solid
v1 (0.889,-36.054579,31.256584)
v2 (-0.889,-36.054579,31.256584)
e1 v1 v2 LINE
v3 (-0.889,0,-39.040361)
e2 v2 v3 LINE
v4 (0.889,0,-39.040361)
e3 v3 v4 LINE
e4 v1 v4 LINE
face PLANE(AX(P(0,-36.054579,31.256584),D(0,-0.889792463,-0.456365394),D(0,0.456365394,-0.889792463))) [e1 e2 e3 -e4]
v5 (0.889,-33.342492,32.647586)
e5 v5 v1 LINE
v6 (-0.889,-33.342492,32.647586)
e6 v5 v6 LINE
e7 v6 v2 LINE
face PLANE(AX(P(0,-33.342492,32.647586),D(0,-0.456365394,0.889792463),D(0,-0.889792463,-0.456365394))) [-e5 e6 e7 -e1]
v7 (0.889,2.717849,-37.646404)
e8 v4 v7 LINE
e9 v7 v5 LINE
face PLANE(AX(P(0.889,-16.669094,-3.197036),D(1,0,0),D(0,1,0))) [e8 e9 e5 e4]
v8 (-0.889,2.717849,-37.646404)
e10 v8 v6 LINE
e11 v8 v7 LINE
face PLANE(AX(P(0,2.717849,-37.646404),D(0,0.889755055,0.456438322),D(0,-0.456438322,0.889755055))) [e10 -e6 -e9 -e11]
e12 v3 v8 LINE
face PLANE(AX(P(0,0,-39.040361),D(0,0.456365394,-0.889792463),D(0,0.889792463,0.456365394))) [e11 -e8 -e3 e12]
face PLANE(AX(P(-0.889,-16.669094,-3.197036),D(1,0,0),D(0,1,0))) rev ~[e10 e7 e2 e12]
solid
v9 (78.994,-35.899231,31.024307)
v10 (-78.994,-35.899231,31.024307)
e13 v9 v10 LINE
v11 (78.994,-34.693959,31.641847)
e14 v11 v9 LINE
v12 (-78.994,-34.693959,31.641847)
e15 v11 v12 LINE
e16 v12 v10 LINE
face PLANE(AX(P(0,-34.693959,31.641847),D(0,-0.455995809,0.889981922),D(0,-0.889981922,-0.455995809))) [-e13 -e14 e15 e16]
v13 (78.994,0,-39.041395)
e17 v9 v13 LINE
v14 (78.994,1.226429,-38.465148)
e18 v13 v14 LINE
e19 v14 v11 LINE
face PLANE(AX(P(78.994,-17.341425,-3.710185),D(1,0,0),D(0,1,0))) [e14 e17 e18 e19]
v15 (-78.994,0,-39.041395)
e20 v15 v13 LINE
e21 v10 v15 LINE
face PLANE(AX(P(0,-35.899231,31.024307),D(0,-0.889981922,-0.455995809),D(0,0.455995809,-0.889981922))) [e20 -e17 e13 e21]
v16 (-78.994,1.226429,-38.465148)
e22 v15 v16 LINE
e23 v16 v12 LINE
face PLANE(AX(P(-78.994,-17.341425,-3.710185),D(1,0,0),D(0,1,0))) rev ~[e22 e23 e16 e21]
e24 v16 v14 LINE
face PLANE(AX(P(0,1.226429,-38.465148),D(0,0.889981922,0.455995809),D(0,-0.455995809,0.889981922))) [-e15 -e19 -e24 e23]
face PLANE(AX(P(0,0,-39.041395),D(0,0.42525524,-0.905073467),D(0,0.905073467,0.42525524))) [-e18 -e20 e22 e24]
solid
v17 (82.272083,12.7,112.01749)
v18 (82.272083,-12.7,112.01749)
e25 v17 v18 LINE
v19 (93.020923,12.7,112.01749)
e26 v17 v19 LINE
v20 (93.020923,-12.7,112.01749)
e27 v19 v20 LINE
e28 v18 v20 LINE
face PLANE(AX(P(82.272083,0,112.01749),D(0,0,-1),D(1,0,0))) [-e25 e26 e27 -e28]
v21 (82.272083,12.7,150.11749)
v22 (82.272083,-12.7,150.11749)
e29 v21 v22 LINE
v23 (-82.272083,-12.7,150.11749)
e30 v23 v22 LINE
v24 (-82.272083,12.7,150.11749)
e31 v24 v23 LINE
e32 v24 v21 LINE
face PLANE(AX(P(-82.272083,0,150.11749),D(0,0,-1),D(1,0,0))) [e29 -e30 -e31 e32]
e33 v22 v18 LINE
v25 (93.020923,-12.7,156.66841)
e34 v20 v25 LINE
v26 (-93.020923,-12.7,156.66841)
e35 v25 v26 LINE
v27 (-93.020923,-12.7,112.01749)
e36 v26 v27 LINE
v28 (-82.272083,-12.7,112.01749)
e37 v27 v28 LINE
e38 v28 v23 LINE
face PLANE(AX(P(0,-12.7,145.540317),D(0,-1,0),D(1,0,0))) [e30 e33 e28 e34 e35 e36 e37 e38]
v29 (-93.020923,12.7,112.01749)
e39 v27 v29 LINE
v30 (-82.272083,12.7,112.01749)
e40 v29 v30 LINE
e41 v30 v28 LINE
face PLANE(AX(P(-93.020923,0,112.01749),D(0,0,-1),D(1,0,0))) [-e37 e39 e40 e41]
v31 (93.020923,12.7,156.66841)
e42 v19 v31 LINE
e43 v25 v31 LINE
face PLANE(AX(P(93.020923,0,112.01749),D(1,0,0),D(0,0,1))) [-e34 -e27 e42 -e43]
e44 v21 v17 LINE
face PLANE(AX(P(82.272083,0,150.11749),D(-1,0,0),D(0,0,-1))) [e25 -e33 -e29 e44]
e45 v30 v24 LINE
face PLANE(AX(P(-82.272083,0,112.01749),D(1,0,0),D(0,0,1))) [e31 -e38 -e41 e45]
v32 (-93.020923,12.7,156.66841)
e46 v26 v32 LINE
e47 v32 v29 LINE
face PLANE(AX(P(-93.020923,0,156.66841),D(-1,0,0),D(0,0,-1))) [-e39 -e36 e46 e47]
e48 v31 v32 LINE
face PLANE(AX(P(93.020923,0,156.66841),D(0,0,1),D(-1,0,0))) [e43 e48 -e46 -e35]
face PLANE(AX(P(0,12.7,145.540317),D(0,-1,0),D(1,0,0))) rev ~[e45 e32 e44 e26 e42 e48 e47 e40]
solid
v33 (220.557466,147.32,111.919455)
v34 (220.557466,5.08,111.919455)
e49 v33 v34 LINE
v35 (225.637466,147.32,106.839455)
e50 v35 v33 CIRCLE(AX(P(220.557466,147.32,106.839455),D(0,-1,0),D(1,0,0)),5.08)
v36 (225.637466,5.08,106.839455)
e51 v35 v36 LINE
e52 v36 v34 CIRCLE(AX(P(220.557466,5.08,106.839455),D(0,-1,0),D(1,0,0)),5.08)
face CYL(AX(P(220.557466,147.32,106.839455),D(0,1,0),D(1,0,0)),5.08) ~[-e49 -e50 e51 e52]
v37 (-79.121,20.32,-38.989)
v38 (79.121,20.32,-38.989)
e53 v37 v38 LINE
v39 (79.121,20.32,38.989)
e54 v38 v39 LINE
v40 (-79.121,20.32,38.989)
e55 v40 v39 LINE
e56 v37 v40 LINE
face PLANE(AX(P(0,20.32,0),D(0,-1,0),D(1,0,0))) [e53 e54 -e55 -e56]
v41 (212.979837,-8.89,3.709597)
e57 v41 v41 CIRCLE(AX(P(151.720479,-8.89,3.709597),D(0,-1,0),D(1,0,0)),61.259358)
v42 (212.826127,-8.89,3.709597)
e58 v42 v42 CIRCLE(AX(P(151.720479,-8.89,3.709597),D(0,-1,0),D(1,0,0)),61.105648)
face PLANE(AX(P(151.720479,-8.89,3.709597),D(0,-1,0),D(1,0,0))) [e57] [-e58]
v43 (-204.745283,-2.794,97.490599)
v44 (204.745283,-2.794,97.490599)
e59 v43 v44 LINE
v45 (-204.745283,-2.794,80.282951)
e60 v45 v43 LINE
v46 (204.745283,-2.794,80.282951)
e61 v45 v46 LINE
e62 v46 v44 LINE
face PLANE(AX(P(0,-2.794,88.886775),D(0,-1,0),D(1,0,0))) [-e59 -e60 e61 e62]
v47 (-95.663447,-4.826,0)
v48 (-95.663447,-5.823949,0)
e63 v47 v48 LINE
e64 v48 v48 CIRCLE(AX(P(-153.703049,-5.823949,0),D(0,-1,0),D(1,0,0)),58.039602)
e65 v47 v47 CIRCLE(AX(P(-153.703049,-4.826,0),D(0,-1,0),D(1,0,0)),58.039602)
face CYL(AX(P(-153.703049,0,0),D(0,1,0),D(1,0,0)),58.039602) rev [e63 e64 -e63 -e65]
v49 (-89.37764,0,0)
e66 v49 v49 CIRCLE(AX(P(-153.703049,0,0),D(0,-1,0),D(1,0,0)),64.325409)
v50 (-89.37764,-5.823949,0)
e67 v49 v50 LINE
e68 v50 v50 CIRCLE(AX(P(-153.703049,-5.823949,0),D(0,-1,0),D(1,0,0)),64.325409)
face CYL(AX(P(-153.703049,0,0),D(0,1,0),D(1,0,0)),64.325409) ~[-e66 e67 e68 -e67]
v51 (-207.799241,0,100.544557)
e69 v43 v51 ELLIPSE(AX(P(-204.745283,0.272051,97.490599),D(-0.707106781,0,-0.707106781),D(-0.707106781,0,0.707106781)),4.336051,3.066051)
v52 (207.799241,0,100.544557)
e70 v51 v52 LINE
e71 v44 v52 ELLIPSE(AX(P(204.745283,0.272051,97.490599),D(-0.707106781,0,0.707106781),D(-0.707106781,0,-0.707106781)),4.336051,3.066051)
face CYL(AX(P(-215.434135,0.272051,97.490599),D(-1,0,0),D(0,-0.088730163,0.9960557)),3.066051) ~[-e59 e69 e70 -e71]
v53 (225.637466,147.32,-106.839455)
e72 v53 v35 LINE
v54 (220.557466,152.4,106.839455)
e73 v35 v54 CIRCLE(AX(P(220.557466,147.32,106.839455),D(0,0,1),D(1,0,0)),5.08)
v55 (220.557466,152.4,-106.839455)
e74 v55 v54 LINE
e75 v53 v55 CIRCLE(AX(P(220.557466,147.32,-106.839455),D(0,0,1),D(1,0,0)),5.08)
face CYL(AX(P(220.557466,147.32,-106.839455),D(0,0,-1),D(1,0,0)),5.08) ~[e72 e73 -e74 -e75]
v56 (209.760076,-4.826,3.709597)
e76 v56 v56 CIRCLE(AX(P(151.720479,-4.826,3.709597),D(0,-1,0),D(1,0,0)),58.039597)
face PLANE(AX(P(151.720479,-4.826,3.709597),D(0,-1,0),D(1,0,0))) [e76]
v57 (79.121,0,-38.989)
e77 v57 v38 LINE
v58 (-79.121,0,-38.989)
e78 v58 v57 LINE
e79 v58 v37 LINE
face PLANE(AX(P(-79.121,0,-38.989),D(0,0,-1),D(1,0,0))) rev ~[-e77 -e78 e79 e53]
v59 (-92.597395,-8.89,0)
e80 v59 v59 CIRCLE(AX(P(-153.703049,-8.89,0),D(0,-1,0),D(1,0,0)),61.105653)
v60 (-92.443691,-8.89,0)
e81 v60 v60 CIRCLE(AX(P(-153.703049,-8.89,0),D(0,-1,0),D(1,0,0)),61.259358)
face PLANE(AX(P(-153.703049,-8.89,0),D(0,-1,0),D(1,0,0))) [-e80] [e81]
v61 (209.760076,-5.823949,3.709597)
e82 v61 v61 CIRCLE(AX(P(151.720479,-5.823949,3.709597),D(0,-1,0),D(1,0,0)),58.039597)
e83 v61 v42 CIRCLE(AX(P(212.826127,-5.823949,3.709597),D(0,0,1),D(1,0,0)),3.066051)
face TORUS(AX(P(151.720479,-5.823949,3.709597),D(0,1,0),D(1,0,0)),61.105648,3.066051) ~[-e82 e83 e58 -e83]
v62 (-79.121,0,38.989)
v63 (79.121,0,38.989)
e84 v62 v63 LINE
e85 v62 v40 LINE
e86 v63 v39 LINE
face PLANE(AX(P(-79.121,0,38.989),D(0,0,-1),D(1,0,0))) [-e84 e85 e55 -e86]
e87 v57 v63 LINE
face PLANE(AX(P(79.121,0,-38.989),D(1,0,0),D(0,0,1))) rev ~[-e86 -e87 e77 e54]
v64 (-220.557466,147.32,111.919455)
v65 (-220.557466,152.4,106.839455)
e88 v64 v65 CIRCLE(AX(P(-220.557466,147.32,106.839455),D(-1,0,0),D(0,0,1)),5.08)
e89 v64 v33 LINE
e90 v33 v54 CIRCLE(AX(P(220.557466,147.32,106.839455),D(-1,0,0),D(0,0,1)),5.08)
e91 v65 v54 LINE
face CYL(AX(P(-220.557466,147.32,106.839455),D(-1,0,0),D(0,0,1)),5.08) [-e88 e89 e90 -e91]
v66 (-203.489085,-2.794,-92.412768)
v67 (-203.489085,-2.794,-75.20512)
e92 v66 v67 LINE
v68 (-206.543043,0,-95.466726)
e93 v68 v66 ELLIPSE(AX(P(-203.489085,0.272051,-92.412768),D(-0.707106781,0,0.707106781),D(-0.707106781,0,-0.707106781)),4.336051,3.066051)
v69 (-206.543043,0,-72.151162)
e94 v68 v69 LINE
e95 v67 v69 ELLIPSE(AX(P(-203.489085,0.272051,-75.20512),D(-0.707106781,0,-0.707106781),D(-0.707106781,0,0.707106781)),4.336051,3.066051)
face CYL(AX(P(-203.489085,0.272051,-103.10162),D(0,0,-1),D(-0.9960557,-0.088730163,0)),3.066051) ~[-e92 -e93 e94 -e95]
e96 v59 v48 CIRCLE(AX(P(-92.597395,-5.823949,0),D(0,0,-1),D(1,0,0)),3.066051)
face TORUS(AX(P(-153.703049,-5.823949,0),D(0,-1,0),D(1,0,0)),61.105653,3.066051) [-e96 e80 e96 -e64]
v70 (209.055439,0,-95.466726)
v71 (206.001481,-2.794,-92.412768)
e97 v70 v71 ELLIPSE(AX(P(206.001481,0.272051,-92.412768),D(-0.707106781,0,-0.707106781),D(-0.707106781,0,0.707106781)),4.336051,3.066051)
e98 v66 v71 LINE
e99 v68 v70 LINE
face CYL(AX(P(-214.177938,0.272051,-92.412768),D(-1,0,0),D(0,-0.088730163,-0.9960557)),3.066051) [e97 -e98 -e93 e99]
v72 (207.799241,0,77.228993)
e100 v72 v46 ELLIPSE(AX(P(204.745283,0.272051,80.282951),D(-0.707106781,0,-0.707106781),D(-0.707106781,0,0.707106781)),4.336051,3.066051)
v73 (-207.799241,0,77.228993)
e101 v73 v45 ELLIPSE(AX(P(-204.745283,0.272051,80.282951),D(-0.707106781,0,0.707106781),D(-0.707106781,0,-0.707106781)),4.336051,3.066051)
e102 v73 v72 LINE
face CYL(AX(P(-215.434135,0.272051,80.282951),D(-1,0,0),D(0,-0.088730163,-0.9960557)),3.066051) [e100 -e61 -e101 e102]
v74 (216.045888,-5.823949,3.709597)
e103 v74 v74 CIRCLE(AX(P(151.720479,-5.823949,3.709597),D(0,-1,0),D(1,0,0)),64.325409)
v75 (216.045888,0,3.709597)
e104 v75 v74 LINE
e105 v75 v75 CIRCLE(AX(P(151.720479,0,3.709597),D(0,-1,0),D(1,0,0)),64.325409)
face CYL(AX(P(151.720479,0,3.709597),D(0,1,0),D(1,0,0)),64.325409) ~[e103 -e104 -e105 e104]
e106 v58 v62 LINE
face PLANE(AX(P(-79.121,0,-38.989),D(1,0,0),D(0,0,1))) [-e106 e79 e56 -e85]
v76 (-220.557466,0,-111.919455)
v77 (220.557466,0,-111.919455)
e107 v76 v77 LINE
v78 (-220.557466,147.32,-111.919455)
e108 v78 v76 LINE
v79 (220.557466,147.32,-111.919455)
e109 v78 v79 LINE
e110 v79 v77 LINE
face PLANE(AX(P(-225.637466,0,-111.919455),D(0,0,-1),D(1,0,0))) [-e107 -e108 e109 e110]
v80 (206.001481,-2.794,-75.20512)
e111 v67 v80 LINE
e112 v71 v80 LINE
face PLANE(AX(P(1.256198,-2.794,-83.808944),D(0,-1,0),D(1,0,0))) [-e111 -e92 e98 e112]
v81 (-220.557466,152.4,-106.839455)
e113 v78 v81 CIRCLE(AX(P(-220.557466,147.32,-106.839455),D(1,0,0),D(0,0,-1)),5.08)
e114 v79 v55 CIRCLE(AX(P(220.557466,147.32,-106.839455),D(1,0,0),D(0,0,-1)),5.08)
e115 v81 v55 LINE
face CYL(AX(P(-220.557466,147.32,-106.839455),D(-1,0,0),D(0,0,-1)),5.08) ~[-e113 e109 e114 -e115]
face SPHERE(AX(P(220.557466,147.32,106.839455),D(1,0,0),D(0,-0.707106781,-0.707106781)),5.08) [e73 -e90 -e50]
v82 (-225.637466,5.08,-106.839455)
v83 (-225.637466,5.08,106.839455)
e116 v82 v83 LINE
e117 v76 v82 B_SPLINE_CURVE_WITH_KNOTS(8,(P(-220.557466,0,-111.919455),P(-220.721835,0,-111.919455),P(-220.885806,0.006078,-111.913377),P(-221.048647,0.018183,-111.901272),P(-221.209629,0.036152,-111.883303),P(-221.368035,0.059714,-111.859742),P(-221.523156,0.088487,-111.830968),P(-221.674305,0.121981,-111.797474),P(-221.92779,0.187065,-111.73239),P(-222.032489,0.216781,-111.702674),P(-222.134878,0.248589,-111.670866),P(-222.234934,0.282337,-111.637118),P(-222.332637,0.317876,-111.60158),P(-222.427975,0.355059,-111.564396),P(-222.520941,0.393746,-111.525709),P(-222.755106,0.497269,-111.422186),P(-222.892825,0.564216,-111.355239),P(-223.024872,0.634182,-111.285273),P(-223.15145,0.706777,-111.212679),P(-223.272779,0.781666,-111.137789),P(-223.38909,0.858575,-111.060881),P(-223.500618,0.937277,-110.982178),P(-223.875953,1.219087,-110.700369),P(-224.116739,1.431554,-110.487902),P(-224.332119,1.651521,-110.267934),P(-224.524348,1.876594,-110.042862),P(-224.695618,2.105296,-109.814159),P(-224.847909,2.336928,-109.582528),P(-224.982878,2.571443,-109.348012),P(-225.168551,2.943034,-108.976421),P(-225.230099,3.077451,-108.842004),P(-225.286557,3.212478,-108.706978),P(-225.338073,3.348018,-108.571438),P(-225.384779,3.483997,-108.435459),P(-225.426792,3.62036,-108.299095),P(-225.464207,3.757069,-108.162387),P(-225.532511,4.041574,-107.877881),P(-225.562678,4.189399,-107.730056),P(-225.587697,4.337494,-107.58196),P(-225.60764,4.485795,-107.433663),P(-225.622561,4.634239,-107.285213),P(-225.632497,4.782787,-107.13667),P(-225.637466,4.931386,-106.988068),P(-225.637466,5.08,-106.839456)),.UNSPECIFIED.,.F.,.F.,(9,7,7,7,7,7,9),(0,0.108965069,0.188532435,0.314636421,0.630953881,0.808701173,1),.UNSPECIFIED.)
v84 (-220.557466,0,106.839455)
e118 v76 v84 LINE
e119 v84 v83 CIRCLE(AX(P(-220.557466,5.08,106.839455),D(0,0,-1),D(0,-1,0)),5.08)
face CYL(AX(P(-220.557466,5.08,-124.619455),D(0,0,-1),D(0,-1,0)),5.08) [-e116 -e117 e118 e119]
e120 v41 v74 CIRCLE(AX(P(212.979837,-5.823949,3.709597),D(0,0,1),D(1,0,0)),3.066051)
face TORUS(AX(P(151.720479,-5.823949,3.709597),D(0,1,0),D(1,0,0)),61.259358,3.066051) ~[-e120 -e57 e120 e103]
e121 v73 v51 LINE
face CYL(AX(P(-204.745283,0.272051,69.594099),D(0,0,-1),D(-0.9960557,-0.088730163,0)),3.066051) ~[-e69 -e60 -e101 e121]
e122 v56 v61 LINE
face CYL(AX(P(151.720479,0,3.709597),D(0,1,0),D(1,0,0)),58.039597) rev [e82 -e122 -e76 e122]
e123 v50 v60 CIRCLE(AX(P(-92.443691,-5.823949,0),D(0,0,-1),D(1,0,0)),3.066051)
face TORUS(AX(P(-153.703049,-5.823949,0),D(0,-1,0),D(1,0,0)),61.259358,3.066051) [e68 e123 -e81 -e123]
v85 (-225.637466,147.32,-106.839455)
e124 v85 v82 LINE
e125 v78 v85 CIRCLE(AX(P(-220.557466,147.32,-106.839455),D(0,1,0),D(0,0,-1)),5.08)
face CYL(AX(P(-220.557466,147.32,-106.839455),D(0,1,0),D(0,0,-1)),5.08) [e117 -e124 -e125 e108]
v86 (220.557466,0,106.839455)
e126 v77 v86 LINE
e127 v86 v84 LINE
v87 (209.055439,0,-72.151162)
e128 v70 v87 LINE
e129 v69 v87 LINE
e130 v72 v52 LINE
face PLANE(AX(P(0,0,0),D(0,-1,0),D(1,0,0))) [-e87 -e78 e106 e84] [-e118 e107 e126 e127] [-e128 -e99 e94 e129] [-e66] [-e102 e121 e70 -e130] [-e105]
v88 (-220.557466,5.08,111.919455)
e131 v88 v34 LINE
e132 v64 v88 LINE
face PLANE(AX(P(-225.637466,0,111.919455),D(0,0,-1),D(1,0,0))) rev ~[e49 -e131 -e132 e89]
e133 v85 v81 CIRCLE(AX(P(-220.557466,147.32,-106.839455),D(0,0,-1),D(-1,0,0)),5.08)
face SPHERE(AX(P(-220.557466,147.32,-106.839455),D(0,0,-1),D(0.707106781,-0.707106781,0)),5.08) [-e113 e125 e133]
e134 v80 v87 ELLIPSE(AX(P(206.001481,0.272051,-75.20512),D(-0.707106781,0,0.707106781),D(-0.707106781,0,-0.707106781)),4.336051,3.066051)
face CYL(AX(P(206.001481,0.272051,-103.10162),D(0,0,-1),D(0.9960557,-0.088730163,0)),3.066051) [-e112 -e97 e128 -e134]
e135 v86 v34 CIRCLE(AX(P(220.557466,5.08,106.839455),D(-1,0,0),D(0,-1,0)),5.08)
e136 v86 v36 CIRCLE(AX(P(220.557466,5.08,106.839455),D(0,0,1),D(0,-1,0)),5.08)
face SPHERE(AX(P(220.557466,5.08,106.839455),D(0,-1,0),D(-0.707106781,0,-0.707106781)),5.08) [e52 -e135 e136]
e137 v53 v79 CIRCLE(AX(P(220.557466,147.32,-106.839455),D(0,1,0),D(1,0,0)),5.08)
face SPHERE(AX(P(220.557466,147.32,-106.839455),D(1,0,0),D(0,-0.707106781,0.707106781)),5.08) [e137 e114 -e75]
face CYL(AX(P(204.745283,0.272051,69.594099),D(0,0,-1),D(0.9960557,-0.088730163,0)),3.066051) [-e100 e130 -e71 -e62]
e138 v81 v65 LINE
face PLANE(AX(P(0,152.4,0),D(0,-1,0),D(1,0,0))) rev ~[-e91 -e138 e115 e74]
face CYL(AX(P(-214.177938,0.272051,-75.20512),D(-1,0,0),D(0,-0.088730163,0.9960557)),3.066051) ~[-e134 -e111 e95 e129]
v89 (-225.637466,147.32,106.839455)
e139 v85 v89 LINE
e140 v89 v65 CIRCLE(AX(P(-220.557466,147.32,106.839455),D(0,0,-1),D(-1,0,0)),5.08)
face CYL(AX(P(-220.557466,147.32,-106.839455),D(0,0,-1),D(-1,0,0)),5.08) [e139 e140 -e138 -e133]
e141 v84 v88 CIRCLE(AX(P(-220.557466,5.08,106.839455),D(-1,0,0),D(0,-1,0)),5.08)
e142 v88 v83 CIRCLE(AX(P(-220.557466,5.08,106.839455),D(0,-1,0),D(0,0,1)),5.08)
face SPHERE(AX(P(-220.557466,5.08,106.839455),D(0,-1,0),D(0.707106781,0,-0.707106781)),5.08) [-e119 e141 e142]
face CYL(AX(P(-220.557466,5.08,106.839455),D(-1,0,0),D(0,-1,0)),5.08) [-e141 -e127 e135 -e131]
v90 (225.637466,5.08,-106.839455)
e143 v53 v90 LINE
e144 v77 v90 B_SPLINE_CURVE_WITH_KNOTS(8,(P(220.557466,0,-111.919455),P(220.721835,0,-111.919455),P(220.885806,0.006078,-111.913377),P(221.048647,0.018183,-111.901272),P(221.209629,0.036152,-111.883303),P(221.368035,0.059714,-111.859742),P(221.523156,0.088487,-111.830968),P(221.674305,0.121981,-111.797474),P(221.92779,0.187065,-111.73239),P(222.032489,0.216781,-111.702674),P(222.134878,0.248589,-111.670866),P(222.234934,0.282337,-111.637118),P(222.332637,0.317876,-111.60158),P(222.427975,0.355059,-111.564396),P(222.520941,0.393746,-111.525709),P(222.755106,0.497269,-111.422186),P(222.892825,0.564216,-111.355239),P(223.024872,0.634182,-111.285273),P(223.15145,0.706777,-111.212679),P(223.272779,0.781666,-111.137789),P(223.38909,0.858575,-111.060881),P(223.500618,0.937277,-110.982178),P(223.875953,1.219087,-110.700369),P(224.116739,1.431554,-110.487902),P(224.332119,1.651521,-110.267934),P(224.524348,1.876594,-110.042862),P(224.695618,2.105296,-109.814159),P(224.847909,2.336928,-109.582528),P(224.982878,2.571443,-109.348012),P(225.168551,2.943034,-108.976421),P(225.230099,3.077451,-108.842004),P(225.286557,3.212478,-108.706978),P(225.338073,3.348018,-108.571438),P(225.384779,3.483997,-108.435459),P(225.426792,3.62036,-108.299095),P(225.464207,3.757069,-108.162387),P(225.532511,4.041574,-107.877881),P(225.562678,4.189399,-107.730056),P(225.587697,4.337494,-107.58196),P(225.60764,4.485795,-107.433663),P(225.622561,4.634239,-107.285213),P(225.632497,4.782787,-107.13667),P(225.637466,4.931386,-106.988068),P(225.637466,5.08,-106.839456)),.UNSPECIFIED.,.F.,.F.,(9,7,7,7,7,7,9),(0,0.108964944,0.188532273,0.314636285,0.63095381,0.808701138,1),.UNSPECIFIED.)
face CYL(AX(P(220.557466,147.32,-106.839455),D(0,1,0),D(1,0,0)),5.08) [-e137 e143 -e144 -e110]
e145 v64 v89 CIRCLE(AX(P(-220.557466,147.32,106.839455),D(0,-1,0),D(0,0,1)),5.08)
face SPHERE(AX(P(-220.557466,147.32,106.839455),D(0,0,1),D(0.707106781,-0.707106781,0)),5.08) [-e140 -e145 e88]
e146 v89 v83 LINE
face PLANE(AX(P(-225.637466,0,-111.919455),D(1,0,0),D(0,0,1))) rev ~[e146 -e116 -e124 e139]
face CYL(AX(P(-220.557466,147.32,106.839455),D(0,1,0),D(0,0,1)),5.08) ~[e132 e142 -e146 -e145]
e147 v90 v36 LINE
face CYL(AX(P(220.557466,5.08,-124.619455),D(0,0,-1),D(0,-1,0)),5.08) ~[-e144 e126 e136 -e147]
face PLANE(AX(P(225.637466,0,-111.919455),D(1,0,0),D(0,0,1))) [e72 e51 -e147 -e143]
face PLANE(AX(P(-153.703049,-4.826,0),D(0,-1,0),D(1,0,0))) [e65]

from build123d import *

# Parameters (mm, degrees)
F1_W          = 451.2749314308
F1_H          = 223.8389104605
F2_DEPTH      = 152.4
F0_W          = 158.242
F0_H          = 77.978
F3_DEPTH      = 20.32
F4_R          = 64.3254088221
F4_R_2        = 58.039602145
F4_R_3        = 58.0395969
F5_DEPTH      = 8.89
F6_DEPTH      = 4.826
F7_W          = 415.5984818935
F7_H          = 23.315563798
F8_DEPTH      = 2.794
F10_DEPTH     = 0.889
F12_DEPTH     = 78.994
F14_DEPTH     = 12.7
F15_R         = 3.0660512242
F16_T1_DEPTH  = 430.8682708909
F16_T3_DEPTH  = 38.5853527953
F16_T5_DEPTH  = 430.8682708909
F16_T7_DEPTH  = 38.5853527953
F17_T1_DEPTH  = 231.4589104605
F17_T3_DEPTH  = 213.6789104605
F17_T5_DEPTH  = 160.02
F17_T7_DEPTH  = 142.24
F17_T9_DEPTH  = 441.1149314308
F17_S13_W     = 5.1816
F17_S13_H     = 5.1816
F17_T14_DEPTH = 5.1816
F17_S19_W     = 5.1816
F17_S19_H     = 5.1816
F17_T20_DEPTH = 5.1816
F17_S25_W     = 5.1816
F17_S25_H     = 5.1816
F17_T26_DEPTH = 5.1816
F17_S31_W     = 5.1816
F17_S31_H     = 5.1816
F17_T32_DEPTH = 5.1816
F17_S37_W     = 5.1816
F17_S37_H     = 5.1816
F17_T38_DEPTH = 5.1816
F17_S43_W     = 5.1816
F17_S43_H     = 5.1816
F17_T44_DEPTH = 5.1816


# Not quite as in the source:
# - a fillet or chamfer that OpenCascade refuses, or shapes differently, is made with other operations: its cross-section is extruded or revolved along the edge and cut away or added


with BuildPart() as f2:
    # F1 (on Front) → F2 (new body)
    with BuildSketch(Plane.XZ):
        Rectangle(F1_W, F1_H)
    extrude(amount=-F2_DEPTH)

    # F0 (on Front) → F3 (cut)
    with BuildSketch(Plane.XZ):
        Rectangle(F0_W, F0_H)
    extrude(amount=-F3_DEPTH, mode=Mode.SUBTRACT)

    # F4 (on Front) → F5 (join)
    with BuildSketch(Plane.XZ):
        with Locations((-153.7030488253, 0)):
            Circle(F4_R)
        with Locations((-153.7030488253, 0)):
            Circle(F4_R_2, mode=Mode.SUBTRACT)
        with Locations((151.7204791307, 3.7095970474)):
            Circle(F4_R)
        with Locations((151.7204791307, 3.7095970474)):
            Circle(F4_R_3, mode=Mode.SUBTRACT)
    extrude(amount=F5_DEPTH)

    # F4 (on Front) → F6 (join)
    with BuildSketch(Plane.XZ):
        with Locations((151.7204791307, 3.7095970474)):
            Circle(F4_R_3)
        with Locations((-153.7030488253, 0)):
            Circle(F4_R_2)
    extrude(amount=F6_DEPTH)

    # F7 (on Front) → F8 (join)
    with BuildSketch(Plane.XZ):
        with Locations((0, 88.8867750764)):
            Rectangle(F7_W, F7_H)
        with Locations((1.256197691, -83.8089436293)):
            Rectangle(F7_W, F7_H)
    extrude(amount=F8_DEPTH)

    # F15
    f15_edges = [f2.edges().sort_by_distance(p)[0] for p in [
        (-211.742651, -8.89, 0),
        (-218.028458, -8.89, 0),
        (87.39507, -8.89, 3.709597),
        (93.680882, -8.89, 3.709597),
    ]]
    fillet(f15_edges, radius=F15_R)

    # F16: fillet of radius 3.0660512242 on 8 edges, made by hand

    # F16_s2 → F16_t1 (cut)
    with BuildSketch(Plane.YZ.offset(-215.4341354454)):
        with BuildLine():
            ThreePointArc((0, 100.5445569754), (-1.9901151157, 99.5602062788), (-2.794, 97.4905991759))
            Line((-2.794, 97.4905991759), (-2.794, 100.5445569754))
            Line((-2.794, 100.5445569754), (0, 100.5445569754))
        make_face()
        with BuildLine():
            ThreePointArc((0, 77.2289931774), (-1.9901151157, 78.213343874), (-2.794, 80.2829509769))
            Line((-2.794, 80.2829509769), (-2.794, 77.2289931774))
            Line((-2.794, 77.2289931774), (0, 77.2289931774))
        make_face()
    extrude(amount=F16_T1_DEPTH, mode=Mode.SUBTRACT)

    # F16_s4 → F16_t3 (cut)
    with BuildSketch(Plane.XY.offset(69.5940986788)):
        with BuildLine():
            ThreePointArc((-207.7992409468, 0), (-206.8148902502, -1.9901151157), (-204.7452831473, -2.794))
            Line((-204.7452831473, -2.794), (-207.7992409468, -2.794))
            Line((-207.7992409468, -2.794), (-207.7992409468, 0))
        make_face()
        with BuildLine():
            ThreePointArc((207.7992409468, 0), (206.8148902502, -1.9901151157), (204.7452831473, -2.794))
            Line((204.7452831473, -2.794), (207.7992409468, -2.794))
            Line((207.7992409468, -2.794), (207.7992409468, 0))
        make_face()
    extrude(amount=F16_T3_DEPTH, mode=Mode.SUBTRACT)

    # F16_s6 → F16_t5 (cut)
    with BuildSketch(Plane.YZ.offset(-214.1779377545)):
        with BuildLine():
            ThreePointArc((0, -72.1511617303), (-1.9901151157, -73.1355124269), (-2.794, -75.2051195298))
            Line((-2.794, -75.2051195298), (-2.794, -72.1511617303))
            Line((-2.794, -72.1511617303), (0, -72.1511617303))
        make_face()
        with BuildLine():
            ThreePointArc((0, -95.4667255282), (-1.9901151157, -94.4823748316), (-2.794, -92.4127677288))
            Line((-2.794, -92.4127677288), (-2.794, -95.4667255282))
            Line((-2.794, -95.4667255282), (0, -95.4667255282))
        make_face()
    extrude(amount=F16_T5_DEPTH, mode=Mode.SUBTRACT)

    # F16_s8 → F16_t7 (cut)
    with BuildSketch(Plane.XY.offset(-103.1016200269)):
        with BuildLine():
            ThreePointArc((209.0554386377, 0), (208.0710879411, -1.9901151157), (206.0014808383, -2.794))
            Line((206.0014808383, -2.794), (209.0554386377, -2.794))
            Line((209.0554386377, -2.794), (209.0554386377, 0))
        make_face()
        with BuildLine():
            ThreePointArc((-206.5430432558, 0), (-205.5586925592, -1.9901151157), (-203.4890854563, -2.794))
            Line((-203.4890854563, -2.794), (-206.5430432558, -2.794))
            Line((-206.5430432558, -2.794), (-206.5430432558, 0))
        make_face()
    extrude(amount=F16_T7_DEPTH, mode=Mode.SUBTRACT)

    # F17: fillet of radius 5.08 on 11 edges, made by hand

    # F17_s2 → F17_t1 (cut)
    with BuildSketch(Plane.XY.offset(-124.6194552302)):
        with BuildLine():
            ThreePointArc((-220.5574657154, 0), (-224.1495681638, 1.4878975516), (-225.6374657154, 5.08))
            Line((-225.6374657154, 5.08), (-225.6374657154, 0))
            Line((-225.6374657154, 0), (-220.5574657154, 0))
        make_face()
        with BuildLine():
            ThreePointArc((220.5574657154, 0), (224.1495681638, 1.4878975516), (225.6374657154, 5.08))
            Line((225.6374657154, 5.08), (225.6374657154, 0))
            Line((225.6374657154, 0), (220.5574657154, 0))
        make_face()
    extrude(amount=F17_T1_DEPTH, mode=Mode.SUBTRACT)

    # F17_s4 → F17_t3 (cut)
    with BuildSketch(Plane.XY.offset(-106.8394552302)):
        with BuildLine():
            ThreePointArc((-225.6374657154, 147.32), (-224.1495681638, 150.9121024484), (-220.5574657154, 152.4))
            Line((-220.5574657154, 152.4), (-225.6374657154, 152.4))
            Line((-225.6374657154, 152.4), (-225.6374657154, 147.32))
        make_face()
        with BuildLine():
            ThreePointArc((225.6374657154, 147.32), (224.1495681638, 150.9121024484), (220.5574657154, 152.4))
            Line((220.5574657154, 152.4), (225.6374657154, 152.4))
            Line((225.6374657154, 152.4), (225.6374657154, 147.32))
        make_face()
    extrude(amount=F17_T3_DEPTH, mode=Mode.SUBTRACT)

    # F17_s6 → F17_t5 (cut)
    with BuildSketch(Plane.XZ.offset(-147.32)):
        with BuildLine():
            ThreePointArc((225.6374657154, -106.8394552302), (224.1495681638, -110.4315576787), (220.5574657154, -111.9194552302))
            Line((220.5574657154, -111.9194552302), (225.6374657154, -111.9194552302))
            Line((225.6374657154, -111.9194552302), (225.6374657154, -106.8394552302))
        make_face()
        with BuildLine():
            ThreePointArc((-220.5574657154, -111.9194552302), (-224.1495681638, -110.4315576787), (-225.6374657154, -106.8394552302))
            Line((-225.6374657154, -106.8394552302), (-225.6374657154, -111.9194552302))
            Line((-225.6374657154, -111.9194552302), (-220.5574657154, -111.9194552302))
        make_face()
    extrude(amount=F17_T5_DEPTH, mode=Mode.SUBTRACT)

    # F17_s8 → F17_t7 (cut)
    with BuildSketch(Plane.XZ.offset(-147.32)):
        with BuildLine():
            ThreePointArc((225.6374657154, 106.8394552302), (224.1495681638, 110.4315576787), (220.5574657154, 111.9194552302))
            Line((220.5574657154, 111.9194552302), (225.6374657154, 111.9194552302))
            Line((225.6374657154, 111.9194552302), (225.6374657154, 106.8394552302))
        make_face()
        with BuildLine():
            ThreePointArc((-220.5574657154, 111.9194552302), (-224.1495681638, 110.4315576787), (-225.6374657154, 106.8394552302))
            Line((-225.6374657154, 106.8394552302), (-225.6374657154, 111.9194552302))
            Line((-225.6374657154, 111.9194552302), (-220.5574657154, 111.9194552302))
        make_face()
    extrude(amount=F17_T7_DEPTH, mode=Mode.SUBTRACT)

    # F17_s10 → F17_t9 (cut)
    with BuildSketch(Plane.YZ.offset(-220.5574657154)):
        with BuildLine():
            ThreePointArc((0, 106.8394552302), (1.4878975516, 110.4315576787), (5.08, 111.9194552302))
            Line((5.08, 111.9194552302), (0, 111.9194552302))
            Line((0, 111.9194552302), (0, 106.8394552302))
        make_face()
        with BuildLine():
            ThreePointArc((147.32, 111.9194552302), (150.9121024484, 110.4315576787), (152.4, 106.8394552302))
            Line((152.4, 106.8394552302), (152.4, 111.9194552302))
            Line((152.4, 111.9194552302), (147.32, 111.9194552302))
        make_face()
        with BuildLine():
            ThreePointArc((147.32, -111.9194552302), (150.9121024484, -110.4315576787), (152.4, -106.8394552302))
            Line((152.4, -106.8394552302), (152.4, -111.9194552302))
            Line((152.4, -111.9194552302), (147.32, -111.9194552302))
        make_face()
    extrude(amount=F17_T9_DEPTH, mode=Mode.SUBTRACT)


with BuildPart() as f10:
    # F9 (on Right) → F10 (new body, symmetric)
    with BuildSketch(Plane.YZ):
        Polygon((-36.0545791317, 31.2565839037), (0, -39.0403605998), (2.7178491377, -37.6464037572), (-33.3424917044, 32.6475856244), align=None)
    extrude(amount=F10_DEPTH, both=True)


with BuildPart() as f12:
    # F11 (on Right) → F12 (new body, symmetric)
    with BuildSketch(Plane.YZ):
        Polygon((-35.8992308868, 31.0243072869), (0, -39.041394805), (1.226429409, -38.4651481785), (-34.6939585845, 31.64184693), align=None)
    extrude(amount=F12_DEPTH, both=True)


with BuildPart() as f14:
    # F13 (on Front) → F14 (new body, symmetric)
    with BuildSketch(Plane.XZ):
        Polygon((-93.0209234357, 112.0174899697), (-82.2720825672, 112.0174899697), (-82.2720825672, 150.1174899697), (0, 150.1174899697), (82.2720825672, 150.1174899697), (82.2720825672, 112.0174899697), (93.0209234357, 112.0174899697), (93.0209234357, 150.1174899697), (93.0209234357, 156.6684097052), (0, 156.6684097052), (-93.0209234357, 156.6684097052), (-93.0209234357, 150.1174899697), align=None)
    extrude(amount=F14_DEPTH, both=True)


with BuildPart() as f17_tool12:
    # F17_s13 → F17_t14 (new body)
    with BuildSketch(Plane.XZ.offset(-5.08)):
        with Locations((-223.1482657154, 109.4302552302)):
            Rectangle(F17_S13_W, F17_S13_H)
    extrude(amount=F17_T14_DEPTH)

    # F17_s15 → F17_t16 (revolve, cut)
    with BuildSketch(Plane(origin=(-220.5574657154, 5.08, 106.8394552302), x_dir=(0.7071067812, 0, -0.7071067812), z_dir=(-0.7071067812, 0, -0.7071067812))):
        with BuildLine():
            ThreePointArc((0, -5.08), (5.08, 0), (0, 5.08))
            Line((0, 5.08), (0, -5.08))
        make_face()
    revolve(axis=Axis((-220.5574657154, 5.08, 106.8394552302), (0, -1, 0)), mode=Mode.SUBTRACT)


with BuildPart() as f2_1:
    add(f2.part)

    # F17_t11: cut F17_tool12
    add(f17_tool12.part, mode=Mode.SUBTRACT)


with BuildPart() as f17_tool18:
    # F17_s19 → F17_t20 (new body)
    with BuildSketch(Plane.XY.offset(106.8394552302)):
        with Locations((-223.1482657154, 149.9108)):
            Rectangle(F17_S19_W, F17_S19_H)
    extrude(amount=F17_T20_DEPTH)

    # F17_s21 → F17_t22 (revolve, cut)
    with BuildSketch(Plane(origin=(-220.5574657154, 147.32, 106.8394552302), x_dir=(0.7071067812, -0.7071067812, 0), z_dir=(-0.7071067812, -0.7071067812, 0))):
        with BuildLine():
            ThreePointArc((0, -5.08), (5.08, 0), (0, 5.08))
            Line((0, 5.08), (0, -5.08))
        make_face()
    revolve(axis=Axis((-220.5574657154, 147.32, 106.8394552302), (0, 0, 1)), mode=Mode.SUBTRACT)


with BuildPart() as f2_2:
    add(f2_1.part)

    # F17_t17: cut F17_tool18
    add(f17_tool18.part, mode=Mode.SUBTRACT)


with BuildPart() as f17_tool24:
    # F17_s25 → F17_t26 (new body)
    with BuildSketch(Plane.XY.offset(-106.8394552302)):
        with Locations((-223.1482657154, 149.9108)):
            Rectangle(F17_S25_W, F17_S25_H)
    extrude(amount=-F17_T26_DEPTH)

    # F17_s27 → F17_t28 (revolve, cut)
    with BuildSketch(Plane(origin=(-220.5574657154, 147.32, -106.8394552302), x_dir=(0.7071067812, -0.7071067812, 0), z_dir=(0.7071067812, 0.7071067812, 0))):
        with BuildLine():
            ThreePointArc((0, -5.08), (5.08, 0), (0, 5.08))
            Line((0, 5.08), (0, -5.08))
        make_face()
    revolve(axis=Axis((-220.5574657154, 147.32, -106.8394552302), (0, 0, -1)), mode=Mode.SUBTRACT)


with BuildPart() as f2_3:
    add(f2_2.part)

    # F17_t23: cut F17_tool24
    add(f17_tool24.part, mode=Mode.SUBTRACT)


with BuildPart() as f17_tool30:
    # F17_s31 → F17_t32 (new body)
    with BuildSketch(Plane.XZ.offset(-5.08)):
        with Locations((223.1482657154, 109.4302552302)):
            Rectangle(F17_S31_W, F17_S31_H)
    extrude(amount=F17_T32_DEPTH)

    # F17_s33 → F17_t34 (revolve, cut)
    with BuildSketch(Plane(origin=(220.5574657154, 5.08, 106.8394552302), x_dir=(-0.7071067812, 0, -0.7071067812), z_dir=(-0.7071067812, 0, 0.7071067812))):
        with BuildLine():
            ThreePointArc((0, -5.08), (5.08, 0), (0, 5.08))
            Line((0, 5.08), (0, -5.08))
        make_face()
    revolve(axis=Axis((220.5574657154, 5.08, 106.8394552302), (0, -1, 0)), mode=Mode.SUBTRACT)


with BuildPart() as f2_4:
    add(f2_3.part)

    # F17_t29: cut F17_tool30
    add(f17_tool30.part, mode=Mode.SUBTRACT)


with BuildPart() as f17_tool36:
    # F17_s37 → F17_t38 (new body)
    with BuildSketch(Plane.YZ.offset(220.5574657154)):
        with Locations((149.9108, -109.4302552302)):
            Rectangle(F17_S37_W, F17_S37_H)
    extrude(amount=F17_T38_DEPTH)

    # F17_s39 → F17_t40 (revolve, cut)
    with BuildSketch(Plane(origin=(220.5574657154, 147.32, -106.8394552302), x_dir=(0, -0.7071067812, 0.7071067812), z_dir=(0, 0.7071067812, 0.7071067812))):
        with BuildLine():
            ThreePointArc((0, -5.08), (5.08, 0), (0, 5.08))
            Line((0, 5.08), (0, -5.08))
        make_face()
    revolve(axis=Axis((220.5574657154, 147.32, -106.8394552302), (1, 0, 0)), mode=Mode.SUBTRACT)


with BuildPart() as f2_5:
    add(f2_4.part)

    # F17_t35: cut F17_tool36
    add(f17_tool36.part, mode=Mode.SUBTRACT)


with BuildPart() as f17_tool42:
    # F17_s43 → F17_t44 (new body)
    with BuildSketch(Plane.YZ.offset(220.5574657154)):
        with Locations((149.9108, 109.4302552302)):
            Rectangle(F17_S43_W, F17_S43_H)
    extrude(amount=F17_T44_DEPTH)

    # F17_s45 → F17_t46 (revolve, cut)
    with BuildSketch(Plane(origin=(220.5574657154, 147.32, 106.8394552302), x_dir=(0, -0.7071067812, -0.7071067812), z_dir=(0, -0.7071067812, 0.7071067812))):
        with BuildLine():
            ThreePointArc((0, -5.08), (5.08, 0), (0, 5.08))
            Line((0, 5.08), (0, -5.08))
        make_face()
    revolve(axis=Axis((220.5574657154, 147.32, 106.8394552302), (1, 0, 0)), mode=Mode.SUBTRACT)


with BuildPart() as f2_6:
    add(f2_5.part)

    # F17_t41: cut F17_tool42
    add(f17_tool42.part, mode=Mode.SUBTRACT)


solid = Compound([f10.part, f12.part, f14.part, f2_6.part])
